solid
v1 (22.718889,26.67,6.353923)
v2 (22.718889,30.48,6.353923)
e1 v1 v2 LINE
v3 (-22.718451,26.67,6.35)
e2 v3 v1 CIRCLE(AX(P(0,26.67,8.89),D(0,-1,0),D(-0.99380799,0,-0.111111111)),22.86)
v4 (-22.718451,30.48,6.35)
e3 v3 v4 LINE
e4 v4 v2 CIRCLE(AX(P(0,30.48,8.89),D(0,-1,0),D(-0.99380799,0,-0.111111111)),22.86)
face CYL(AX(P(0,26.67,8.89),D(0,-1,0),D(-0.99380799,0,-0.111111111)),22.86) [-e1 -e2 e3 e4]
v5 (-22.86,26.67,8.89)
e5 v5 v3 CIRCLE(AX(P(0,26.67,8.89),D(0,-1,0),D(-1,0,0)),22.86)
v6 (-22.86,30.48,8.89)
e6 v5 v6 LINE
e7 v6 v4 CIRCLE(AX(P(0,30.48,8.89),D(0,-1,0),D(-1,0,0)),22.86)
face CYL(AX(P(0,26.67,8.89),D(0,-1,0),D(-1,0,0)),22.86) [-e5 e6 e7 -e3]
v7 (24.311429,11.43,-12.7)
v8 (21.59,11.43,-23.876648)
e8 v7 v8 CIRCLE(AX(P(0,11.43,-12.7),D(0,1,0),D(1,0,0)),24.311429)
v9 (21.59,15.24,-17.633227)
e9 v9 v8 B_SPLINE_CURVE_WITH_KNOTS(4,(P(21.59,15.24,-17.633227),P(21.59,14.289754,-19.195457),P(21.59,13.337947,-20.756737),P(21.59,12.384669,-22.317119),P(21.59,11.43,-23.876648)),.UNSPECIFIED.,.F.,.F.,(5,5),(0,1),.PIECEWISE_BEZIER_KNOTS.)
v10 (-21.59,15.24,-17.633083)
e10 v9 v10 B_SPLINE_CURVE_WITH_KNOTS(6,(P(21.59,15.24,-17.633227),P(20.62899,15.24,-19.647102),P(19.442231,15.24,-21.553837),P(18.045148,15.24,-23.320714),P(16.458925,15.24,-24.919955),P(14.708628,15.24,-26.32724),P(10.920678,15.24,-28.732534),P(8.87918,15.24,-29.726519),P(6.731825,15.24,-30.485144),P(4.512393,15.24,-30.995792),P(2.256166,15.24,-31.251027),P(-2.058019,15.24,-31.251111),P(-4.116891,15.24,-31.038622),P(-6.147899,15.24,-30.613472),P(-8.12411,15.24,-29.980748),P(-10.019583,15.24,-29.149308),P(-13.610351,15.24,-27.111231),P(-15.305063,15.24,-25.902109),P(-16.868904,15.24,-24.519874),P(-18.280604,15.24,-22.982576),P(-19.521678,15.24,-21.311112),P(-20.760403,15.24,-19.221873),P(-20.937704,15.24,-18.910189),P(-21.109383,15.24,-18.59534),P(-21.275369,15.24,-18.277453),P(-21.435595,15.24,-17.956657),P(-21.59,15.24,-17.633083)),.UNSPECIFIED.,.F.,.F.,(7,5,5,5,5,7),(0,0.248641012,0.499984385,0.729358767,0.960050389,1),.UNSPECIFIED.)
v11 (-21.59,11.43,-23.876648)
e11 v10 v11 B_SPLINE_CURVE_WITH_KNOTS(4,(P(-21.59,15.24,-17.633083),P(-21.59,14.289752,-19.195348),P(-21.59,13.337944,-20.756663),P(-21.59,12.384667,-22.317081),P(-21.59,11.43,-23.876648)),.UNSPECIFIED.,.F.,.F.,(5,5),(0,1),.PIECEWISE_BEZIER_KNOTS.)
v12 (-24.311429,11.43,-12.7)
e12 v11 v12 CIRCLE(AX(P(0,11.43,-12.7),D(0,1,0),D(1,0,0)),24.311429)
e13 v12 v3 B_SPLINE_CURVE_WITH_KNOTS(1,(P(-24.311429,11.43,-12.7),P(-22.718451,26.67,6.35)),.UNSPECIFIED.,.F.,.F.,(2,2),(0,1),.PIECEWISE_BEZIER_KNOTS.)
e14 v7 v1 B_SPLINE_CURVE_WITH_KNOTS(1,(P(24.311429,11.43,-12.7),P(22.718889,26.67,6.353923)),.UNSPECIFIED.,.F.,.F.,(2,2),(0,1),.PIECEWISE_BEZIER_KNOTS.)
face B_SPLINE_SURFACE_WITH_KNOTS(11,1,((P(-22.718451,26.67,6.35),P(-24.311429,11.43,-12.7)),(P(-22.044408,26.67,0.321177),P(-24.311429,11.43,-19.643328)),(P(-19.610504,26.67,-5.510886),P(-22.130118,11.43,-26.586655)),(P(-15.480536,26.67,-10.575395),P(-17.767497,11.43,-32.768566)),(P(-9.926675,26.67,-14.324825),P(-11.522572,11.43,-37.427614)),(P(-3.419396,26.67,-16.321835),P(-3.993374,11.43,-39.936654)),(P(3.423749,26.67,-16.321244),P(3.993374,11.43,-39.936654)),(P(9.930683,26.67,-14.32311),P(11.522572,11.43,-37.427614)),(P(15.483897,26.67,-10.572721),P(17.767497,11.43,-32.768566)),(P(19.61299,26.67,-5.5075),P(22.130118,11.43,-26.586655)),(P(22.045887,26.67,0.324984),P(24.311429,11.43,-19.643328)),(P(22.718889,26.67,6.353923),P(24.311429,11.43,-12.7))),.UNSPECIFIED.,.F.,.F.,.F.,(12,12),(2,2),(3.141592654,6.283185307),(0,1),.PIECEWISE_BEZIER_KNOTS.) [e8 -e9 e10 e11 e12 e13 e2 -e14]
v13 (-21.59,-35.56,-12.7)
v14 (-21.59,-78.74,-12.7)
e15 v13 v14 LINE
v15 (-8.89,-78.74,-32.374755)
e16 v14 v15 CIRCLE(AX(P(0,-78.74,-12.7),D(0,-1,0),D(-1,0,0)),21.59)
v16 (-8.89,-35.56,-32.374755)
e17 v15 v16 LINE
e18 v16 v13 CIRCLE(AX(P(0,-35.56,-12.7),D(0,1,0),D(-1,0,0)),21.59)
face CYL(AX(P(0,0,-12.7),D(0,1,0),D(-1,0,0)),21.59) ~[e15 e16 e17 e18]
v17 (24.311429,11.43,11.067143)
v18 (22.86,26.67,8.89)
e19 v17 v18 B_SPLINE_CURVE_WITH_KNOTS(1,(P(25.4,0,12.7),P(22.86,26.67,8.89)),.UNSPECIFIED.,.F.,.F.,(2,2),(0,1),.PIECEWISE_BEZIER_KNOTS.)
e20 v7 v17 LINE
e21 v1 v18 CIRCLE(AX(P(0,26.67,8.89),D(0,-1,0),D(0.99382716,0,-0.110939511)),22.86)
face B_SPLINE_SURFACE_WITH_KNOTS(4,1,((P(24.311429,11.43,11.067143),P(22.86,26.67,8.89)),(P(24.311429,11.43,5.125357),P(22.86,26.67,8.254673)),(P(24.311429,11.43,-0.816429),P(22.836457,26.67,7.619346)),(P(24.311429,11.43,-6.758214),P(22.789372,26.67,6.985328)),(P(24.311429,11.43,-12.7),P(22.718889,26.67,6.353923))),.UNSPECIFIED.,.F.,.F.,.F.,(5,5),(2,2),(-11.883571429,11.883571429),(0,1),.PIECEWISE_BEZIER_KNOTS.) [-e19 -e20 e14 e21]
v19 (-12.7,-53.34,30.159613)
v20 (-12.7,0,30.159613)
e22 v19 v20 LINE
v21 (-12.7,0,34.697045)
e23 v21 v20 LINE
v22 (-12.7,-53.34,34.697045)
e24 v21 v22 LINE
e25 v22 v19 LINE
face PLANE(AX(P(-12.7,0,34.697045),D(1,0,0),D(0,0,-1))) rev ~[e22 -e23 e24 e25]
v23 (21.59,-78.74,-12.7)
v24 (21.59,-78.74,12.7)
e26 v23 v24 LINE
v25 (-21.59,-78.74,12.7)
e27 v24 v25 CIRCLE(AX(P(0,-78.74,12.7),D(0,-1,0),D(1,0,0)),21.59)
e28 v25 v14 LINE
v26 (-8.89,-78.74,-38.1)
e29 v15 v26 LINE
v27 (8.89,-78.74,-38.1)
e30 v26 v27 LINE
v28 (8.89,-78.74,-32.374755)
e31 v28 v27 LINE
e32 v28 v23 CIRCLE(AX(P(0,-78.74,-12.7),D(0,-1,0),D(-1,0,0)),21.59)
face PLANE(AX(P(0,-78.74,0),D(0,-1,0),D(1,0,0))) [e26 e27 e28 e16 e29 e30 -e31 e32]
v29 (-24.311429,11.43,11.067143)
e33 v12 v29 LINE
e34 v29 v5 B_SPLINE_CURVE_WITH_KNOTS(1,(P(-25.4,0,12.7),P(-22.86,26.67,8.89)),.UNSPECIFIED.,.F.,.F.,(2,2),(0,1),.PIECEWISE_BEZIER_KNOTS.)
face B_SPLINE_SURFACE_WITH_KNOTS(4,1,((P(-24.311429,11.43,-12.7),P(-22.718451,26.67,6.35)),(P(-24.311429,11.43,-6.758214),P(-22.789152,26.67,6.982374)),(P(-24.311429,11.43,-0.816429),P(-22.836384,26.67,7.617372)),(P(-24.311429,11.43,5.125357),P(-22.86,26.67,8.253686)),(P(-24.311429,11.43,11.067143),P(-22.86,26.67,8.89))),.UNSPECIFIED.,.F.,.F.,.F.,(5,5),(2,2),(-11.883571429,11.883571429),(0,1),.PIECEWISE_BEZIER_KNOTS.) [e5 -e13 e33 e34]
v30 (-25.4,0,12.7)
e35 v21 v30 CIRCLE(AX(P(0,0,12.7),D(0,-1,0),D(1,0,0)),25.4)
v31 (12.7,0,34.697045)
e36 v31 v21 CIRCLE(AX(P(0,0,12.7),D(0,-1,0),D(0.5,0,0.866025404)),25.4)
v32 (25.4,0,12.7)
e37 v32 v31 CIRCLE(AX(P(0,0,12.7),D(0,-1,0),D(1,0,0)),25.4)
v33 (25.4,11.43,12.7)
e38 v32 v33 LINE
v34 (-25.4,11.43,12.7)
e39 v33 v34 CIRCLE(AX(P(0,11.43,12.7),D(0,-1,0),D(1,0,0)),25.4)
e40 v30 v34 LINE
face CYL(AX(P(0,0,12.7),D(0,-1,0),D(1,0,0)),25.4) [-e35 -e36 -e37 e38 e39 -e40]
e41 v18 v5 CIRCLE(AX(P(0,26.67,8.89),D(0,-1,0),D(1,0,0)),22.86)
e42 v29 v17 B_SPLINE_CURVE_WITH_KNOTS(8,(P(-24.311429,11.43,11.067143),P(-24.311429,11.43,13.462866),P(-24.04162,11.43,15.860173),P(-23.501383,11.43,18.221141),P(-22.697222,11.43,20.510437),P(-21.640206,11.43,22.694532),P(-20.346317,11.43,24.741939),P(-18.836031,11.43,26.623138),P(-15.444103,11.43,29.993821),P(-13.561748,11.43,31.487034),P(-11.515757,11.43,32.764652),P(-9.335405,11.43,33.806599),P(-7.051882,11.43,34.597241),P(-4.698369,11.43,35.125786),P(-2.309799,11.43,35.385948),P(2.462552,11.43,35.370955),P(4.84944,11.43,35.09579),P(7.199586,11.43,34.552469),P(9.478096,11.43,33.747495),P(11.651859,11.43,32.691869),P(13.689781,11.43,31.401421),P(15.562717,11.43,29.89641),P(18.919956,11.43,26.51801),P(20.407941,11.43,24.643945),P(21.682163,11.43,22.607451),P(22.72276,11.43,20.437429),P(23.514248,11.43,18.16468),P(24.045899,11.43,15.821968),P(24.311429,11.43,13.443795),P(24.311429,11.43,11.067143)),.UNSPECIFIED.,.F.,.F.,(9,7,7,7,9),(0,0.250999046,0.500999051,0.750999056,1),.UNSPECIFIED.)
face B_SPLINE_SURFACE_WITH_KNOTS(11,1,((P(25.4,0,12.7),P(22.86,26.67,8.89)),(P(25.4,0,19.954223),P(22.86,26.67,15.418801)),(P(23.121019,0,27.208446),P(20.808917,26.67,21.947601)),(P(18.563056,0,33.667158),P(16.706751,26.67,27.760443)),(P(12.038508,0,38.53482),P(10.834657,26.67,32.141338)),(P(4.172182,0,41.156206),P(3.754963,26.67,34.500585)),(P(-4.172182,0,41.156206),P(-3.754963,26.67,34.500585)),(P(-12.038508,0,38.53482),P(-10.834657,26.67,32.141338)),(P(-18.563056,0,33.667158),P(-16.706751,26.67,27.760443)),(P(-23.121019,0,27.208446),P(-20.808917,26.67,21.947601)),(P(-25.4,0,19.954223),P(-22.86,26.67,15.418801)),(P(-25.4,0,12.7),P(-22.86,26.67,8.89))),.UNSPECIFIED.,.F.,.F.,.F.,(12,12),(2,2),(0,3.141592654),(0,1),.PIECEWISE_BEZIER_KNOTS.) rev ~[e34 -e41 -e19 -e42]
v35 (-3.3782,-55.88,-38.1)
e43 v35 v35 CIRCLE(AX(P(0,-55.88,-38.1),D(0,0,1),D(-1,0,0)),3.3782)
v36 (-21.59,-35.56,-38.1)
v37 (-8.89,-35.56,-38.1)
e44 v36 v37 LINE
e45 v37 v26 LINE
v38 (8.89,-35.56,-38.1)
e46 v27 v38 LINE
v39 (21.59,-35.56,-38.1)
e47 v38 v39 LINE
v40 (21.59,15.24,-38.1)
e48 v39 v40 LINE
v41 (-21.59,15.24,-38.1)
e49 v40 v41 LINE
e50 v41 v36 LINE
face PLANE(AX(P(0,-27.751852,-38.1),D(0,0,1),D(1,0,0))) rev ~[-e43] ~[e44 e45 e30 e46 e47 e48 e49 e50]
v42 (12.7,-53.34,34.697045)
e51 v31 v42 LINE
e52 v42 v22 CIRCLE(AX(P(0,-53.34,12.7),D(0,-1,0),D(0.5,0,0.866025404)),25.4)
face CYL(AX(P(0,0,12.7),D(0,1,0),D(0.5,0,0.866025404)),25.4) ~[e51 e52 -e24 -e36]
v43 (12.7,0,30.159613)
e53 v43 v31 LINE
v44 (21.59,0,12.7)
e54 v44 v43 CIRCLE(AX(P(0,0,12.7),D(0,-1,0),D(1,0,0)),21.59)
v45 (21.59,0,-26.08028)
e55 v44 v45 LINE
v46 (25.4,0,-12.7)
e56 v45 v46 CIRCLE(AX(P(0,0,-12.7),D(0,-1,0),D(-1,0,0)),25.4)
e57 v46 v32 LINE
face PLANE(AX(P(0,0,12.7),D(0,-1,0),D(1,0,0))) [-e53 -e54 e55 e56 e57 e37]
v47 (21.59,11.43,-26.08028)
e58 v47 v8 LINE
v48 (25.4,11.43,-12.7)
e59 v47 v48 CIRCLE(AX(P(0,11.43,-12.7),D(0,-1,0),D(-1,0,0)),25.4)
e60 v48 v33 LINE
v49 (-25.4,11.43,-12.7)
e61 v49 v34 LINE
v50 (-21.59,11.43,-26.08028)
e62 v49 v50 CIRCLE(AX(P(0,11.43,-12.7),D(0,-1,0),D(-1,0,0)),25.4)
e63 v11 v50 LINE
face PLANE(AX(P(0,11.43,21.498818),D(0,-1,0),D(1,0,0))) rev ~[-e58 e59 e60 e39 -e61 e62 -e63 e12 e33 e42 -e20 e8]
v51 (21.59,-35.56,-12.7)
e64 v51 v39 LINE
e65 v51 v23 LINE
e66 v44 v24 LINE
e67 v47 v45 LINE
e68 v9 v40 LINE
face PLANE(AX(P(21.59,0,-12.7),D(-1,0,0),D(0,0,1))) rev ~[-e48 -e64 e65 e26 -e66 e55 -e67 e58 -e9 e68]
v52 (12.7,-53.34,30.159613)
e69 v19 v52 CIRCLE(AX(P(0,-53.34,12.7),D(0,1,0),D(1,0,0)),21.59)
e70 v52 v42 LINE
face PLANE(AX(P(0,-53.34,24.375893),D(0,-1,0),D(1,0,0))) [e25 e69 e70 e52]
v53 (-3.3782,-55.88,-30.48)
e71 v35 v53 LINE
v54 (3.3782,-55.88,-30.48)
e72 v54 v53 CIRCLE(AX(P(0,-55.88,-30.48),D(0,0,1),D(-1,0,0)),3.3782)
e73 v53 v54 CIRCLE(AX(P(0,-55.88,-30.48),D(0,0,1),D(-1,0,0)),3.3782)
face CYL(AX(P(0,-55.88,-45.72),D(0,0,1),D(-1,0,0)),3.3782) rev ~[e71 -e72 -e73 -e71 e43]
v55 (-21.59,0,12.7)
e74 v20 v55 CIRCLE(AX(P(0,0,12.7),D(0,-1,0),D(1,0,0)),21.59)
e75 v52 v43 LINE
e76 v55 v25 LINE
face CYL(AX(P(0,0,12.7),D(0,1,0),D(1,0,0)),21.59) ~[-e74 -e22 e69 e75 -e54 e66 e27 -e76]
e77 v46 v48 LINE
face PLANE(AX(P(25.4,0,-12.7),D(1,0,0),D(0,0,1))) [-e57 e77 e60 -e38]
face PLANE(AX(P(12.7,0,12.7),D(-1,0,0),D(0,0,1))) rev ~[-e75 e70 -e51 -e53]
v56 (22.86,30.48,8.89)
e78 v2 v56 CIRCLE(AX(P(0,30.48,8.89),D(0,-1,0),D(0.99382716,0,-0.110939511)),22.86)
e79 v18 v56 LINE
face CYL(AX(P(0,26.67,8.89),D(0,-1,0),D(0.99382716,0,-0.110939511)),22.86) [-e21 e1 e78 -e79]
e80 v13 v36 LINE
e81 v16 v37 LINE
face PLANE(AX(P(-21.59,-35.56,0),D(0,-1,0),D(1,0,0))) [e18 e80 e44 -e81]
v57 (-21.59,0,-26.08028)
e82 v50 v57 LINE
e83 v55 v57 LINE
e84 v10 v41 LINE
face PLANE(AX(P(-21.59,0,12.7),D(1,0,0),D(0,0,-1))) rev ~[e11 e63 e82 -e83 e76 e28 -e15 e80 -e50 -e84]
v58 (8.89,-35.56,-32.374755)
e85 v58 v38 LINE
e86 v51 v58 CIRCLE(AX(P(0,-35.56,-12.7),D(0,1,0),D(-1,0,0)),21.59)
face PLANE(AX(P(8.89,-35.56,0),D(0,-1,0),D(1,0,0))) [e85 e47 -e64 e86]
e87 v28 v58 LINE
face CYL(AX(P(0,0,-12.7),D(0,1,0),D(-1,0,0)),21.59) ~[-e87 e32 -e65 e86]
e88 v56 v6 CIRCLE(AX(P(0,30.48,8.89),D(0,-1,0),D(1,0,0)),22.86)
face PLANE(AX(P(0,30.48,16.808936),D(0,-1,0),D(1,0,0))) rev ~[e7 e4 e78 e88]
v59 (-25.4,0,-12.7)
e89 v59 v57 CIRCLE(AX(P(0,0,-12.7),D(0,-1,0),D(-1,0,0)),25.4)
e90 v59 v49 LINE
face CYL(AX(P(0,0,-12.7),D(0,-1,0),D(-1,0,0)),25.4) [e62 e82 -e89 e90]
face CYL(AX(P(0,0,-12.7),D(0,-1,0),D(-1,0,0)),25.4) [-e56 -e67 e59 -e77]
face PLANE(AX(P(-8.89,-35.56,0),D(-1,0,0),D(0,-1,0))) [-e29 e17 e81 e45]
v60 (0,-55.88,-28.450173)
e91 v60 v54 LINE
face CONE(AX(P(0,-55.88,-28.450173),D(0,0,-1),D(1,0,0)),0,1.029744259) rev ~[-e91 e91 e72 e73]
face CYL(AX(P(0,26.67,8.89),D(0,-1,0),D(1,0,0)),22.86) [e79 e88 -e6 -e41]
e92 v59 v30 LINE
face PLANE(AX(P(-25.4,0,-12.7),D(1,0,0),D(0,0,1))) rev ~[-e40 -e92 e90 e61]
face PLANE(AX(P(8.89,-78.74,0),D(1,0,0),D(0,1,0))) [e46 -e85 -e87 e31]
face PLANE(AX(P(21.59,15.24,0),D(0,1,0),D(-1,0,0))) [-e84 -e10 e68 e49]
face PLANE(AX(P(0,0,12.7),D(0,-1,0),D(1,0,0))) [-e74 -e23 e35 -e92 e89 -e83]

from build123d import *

# Parameters (mm, degrees)
F1_DEPTH  = 78.74
F4_W      = 50.8
F4_H      = 25.4
F6_DEPTH  = 11.43
F7_W      = 48.6228571429
F7_H      = 23.7671428571
F10_DEPTH = 3.81
F12_DEPTH = 53.34
F14_DEPTH = 38.1
F16_D     = 6.7564
F16_DEPTH = 7.62
F16_TIP   = 2.0298273432


with BuildPart() as f1:
    # F0 (on Front) → F1 (new body)
    with BuildSketch(Plane.XZ):
        with BuildLine():
            Line((-21.59, 12.7), (-21.59, -12.7))
            ThreePointArc((-21.59, -12.7), (0, -34.29), (21.59, -12.7))
            Line((21.59, -12.7), (21.59, 0))
            Line((21.59, 0), (21.59, 12.7))
            ThreePointArc((21.59, 12.7), (0, 34.29), (-21.59, 12.7))
        make_face()
    extrude(amount=F1_DEPTH)

    # F4 (on Front) → F5 section 0
    with BuildSketch(Plane.XZ):
        with BuildLine():
            Line((-25.4, 12.7), (25.4, 12.7))
            ThreePointArc((25.4, 12.7), (0, 38.1), (-25.4, 12.7))
        make_face()
    # F3 (on offset) → F5 section 1
    with BuildSketch(Plane.XZ.offset(-26.67)):
        with BuildLine():
            Line((-22.86, 8.89), (22.86, 8.89))
            ThreePointArc((22.86, 8.89), (0, 31.75), (-22.86, 8.89))
        make_face()
    loft()

    # F4 (on Front) → F6 (join)
    with BuildSketch(Plane.XZ):
        with BuildLine():
            Line((-25.4, 12.7), (25.4, 12.7))
            ThreePointArc((25.4, 12.7), (0, 38.1), (-25.4, 12.7))
        make_face()
        Rectangle(F4_W, F4_H)
        with BuildLine():
            ThreePointArc((-25.4, -12.7), (0, -38.1), (25.4, -12.7))
            Line((25.4, -12.7), (-25.4, -12.7))
        make_face()
    extrude(amount=-F6_DEPTH)

    # F7 (on face) → F8 section 0
    with BuildSketch(Plane(origin=(0, 11.43, 0), x_dir=(-1, 0, 0), z_dir=(0, 1, 0))):
        with Locations((0, -0.8164285714)):
            Rectangle(F7_W, F7_H)
    # F3 (on offset) → F8 section 1
    with BuildSketch(Plane.XZ.offset(-26.67)):
        with BuildLine():
            ThreePointArc((22.7188888889, 6.3539227823), (22.8246949596, 7.62), (22.86, 8.89))
            Line((22.86, 8.89), (-22.86, 8.89))
            ThreePointArc((-22.86, 8.89), (-22.8245852305, 7.61802946), (-22.7184506514, 6.35))
            Line((-22.7184506514, 6.35), (22.7188888889, 6.3539227823))
        make_face()
    loft()

    # F3 (on offset) → F9 section 0
    with BuildSketch(Plane.XZ.offset(-26.67)):
        with BuildLine():
            ThreePointArc((-22.7184506514, 6.35), (0.0019735927, -13.9699999148), (22.7188888889, 6.3539227823))
            Line((22.7188888889, 6.3539227823), (-22.7184506514, 6.35))
        make_face()
    # F7 (on face) → F9 section 1
    with BuildSketch(Plane(origin=(0, 11.43, 0), x_dir=(-1, 0, 0), z_dir=(0, 1, 0))):
        with BuildLine():
            Line((24.3114285714, -12.7), (-24.3114285714, -12.7))
            ThreePointArc((-24.3114285714, -12.7), (0, -37.0114285714), (24.3114285714, -12.7))
        make_face()
    loft()

    # F3 (on offset) → F10 (join)
    with BuildSketch(Plane.XZ.offset(-26.67)):
        with BuildLine():
            Line((-22.86, 8.89), (22.86, 8.89))
            ThreePointArc((22.86, 8.89), (0, 31.75), (-22.86, 8.89))
        make_face()
        with BuildLine():
            ThreePointArc((22.7188888889, 6.3539227823), (22.8246949596, 7.62), (22.86, 8.89))
            Line((22.86, 8.89), (-22.86, 8.89))
            ThreePointArc((-22.86, 8.89), (-22.8245852305, 7.61802946), (-22.7184506514, 6.35))
            Line((-22.7184506514, 6.35), (22.7188888889, 6.3539227823))
        make_face()
        with BuildLine():
            ThreePointArc((-22.7184506514, 6.35), (0.0019735927, -13.9699999148), (22.7188888889, 6.3539227823))
            Line((22.7188888889, 6.3539227823), (-22.7184506514, 6.35))
        make_face()
    extrude(amount=-F10_DEPTH)

    # F11 (on Front) → F12 (join)
    with BuildSketch(Plane.XZ):
        with BuildLine():
            Line((12.7, 12.7), (12.7, 34.6970452561))
            ThreePointArc((12.7, 34.6970452561), (0, 38.1), (-12.7, 34.6970452561))
            Line((-12.7, 34.6970452561), (-12.7, 12.7))
            Line((-12.7, 12.7), (12.7, 12.7))
        make_face()
    extrude(amount=F12_DEPTH)

    # F13 (on Top) → F14 (join)
    with BuildSketch(Plane.XY):
        Polygon((21.59, -35.56), (21.59, 15.24), (-21.59, 15.24), (-21.59, -35.56), (-8.89, -35.56), (-8.89, -78.74), (8.89, -78.74), (8.89, -35.56), align=None)
    extrude(amount=-F14_DEPTH)

    # F16
    with Locations(Plane(origin=(0, 0, -38.1), x_dir=(1, 0, 0), z_dir=(0, 0, -1))):
        with Locations((0, 55.88)):
            Hole(F16_D / 2, depth=F16_DEPTH)
            with Locations((0, 0, -(F16_DEPTH + F16_TIP / 2))):  # 118° drill point
                Cone(0, F16_D / 2, F16_TIP, mode=Mode.SUBTRACT)


solid = f1.part
